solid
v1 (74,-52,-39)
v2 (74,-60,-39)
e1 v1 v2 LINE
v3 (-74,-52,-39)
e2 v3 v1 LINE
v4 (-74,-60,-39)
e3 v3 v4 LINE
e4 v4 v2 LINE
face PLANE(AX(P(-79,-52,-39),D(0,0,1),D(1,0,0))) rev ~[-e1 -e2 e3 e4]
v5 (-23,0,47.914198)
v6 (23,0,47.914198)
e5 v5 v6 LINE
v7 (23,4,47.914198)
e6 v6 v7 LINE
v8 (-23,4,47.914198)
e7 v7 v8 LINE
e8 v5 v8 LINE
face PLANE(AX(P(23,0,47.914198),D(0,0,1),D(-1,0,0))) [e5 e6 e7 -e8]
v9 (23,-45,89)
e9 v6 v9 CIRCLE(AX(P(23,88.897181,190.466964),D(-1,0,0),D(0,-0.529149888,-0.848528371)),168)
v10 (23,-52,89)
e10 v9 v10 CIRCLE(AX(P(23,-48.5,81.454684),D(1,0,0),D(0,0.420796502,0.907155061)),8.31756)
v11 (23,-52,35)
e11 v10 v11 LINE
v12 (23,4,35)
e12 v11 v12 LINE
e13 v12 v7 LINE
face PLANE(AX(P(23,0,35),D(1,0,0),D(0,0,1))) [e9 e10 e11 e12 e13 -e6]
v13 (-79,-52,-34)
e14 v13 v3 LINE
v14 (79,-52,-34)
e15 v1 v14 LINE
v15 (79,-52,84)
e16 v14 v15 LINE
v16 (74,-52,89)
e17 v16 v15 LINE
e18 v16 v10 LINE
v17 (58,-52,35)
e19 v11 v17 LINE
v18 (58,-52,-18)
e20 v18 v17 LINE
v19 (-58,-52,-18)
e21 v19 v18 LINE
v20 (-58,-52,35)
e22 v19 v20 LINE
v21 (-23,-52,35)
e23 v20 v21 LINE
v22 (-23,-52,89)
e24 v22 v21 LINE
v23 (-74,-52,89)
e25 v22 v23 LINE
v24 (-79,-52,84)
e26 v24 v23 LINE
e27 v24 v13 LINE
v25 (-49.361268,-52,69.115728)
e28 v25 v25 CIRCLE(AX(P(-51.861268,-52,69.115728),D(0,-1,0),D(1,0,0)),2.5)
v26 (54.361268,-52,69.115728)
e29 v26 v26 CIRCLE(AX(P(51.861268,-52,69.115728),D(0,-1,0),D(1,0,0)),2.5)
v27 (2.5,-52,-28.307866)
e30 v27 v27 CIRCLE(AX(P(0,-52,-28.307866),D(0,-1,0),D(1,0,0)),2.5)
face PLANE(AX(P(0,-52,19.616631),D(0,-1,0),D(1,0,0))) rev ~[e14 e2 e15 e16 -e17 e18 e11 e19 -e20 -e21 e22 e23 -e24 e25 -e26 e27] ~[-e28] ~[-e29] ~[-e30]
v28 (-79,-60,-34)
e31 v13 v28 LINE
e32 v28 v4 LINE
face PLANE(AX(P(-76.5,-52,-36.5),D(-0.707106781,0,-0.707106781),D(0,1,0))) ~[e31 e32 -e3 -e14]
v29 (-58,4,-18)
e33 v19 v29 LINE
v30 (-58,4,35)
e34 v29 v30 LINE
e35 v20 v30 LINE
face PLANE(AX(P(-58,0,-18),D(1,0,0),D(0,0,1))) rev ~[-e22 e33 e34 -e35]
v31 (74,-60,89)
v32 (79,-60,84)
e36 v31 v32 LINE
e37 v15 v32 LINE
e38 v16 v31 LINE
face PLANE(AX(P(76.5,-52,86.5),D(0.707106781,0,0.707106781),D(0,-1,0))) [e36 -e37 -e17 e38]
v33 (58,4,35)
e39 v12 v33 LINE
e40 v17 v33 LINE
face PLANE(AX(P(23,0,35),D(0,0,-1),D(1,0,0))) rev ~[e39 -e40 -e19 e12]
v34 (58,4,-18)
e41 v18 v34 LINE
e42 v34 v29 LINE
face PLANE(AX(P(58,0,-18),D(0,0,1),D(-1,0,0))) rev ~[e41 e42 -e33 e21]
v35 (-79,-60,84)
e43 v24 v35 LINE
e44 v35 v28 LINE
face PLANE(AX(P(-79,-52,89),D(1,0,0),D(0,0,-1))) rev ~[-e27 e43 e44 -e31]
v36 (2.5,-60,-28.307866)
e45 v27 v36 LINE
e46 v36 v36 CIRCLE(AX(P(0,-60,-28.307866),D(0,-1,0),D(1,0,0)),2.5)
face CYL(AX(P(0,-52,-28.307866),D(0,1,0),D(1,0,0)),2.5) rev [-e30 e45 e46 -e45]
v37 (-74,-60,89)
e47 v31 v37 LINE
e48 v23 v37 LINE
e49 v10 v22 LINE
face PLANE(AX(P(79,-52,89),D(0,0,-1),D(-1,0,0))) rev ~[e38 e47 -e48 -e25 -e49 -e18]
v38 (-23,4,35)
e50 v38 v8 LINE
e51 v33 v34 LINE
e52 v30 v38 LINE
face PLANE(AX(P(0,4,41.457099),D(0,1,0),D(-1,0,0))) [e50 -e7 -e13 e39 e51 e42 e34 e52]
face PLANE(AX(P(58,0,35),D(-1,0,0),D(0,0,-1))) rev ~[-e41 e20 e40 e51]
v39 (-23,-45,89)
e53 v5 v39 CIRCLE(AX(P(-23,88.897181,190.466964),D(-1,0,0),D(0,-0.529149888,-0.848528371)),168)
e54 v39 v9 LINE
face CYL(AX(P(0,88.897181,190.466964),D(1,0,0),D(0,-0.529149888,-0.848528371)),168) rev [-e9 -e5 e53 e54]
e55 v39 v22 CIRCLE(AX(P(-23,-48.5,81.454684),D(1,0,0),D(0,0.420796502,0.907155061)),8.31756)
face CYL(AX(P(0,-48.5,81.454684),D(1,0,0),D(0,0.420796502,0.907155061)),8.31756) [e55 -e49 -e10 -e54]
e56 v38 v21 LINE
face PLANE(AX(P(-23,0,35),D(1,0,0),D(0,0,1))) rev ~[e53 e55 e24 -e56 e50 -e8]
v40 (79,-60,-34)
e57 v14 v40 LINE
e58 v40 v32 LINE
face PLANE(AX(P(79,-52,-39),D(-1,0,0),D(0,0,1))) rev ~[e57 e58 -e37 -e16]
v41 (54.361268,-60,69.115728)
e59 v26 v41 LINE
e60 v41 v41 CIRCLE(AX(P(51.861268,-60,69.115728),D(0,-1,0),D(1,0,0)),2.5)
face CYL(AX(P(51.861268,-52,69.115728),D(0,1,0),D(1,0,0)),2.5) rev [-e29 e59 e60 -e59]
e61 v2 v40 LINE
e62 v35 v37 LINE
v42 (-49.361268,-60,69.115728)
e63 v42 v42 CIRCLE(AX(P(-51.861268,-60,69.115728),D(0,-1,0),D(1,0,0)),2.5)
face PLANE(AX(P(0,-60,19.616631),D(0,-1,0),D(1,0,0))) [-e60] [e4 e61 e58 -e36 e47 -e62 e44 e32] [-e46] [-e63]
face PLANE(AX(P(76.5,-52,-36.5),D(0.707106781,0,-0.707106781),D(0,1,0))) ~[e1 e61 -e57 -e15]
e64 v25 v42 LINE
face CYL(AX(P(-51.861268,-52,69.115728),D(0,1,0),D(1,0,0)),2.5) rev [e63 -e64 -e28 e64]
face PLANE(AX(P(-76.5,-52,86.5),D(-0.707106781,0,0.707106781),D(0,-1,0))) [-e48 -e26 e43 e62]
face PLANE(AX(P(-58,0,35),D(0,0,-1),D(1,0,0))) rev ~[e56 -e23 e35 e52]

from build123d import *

# Parameters (mm, degrees)
F0_W     = 116
F0_H     = 53
F1_DEPTH = 52
F3_DEPTH = 23
F4_R     = 2.5
F5_DEPTH = 8
F6_SIZE  = 5
F7_W     = 46
F7_H     = 12.914198093
F8_DEPTH = 4


# Not quite as in the source:
# - a feature names something its author has since deleted; it is built from what else it names


with BuildPart() as f1:
    # F0 (on Front) → F1 (new body)
    with BuildSketch(Plane.XZ):
        with Locations((0, 8.5)):
            Rectangle(F0_W, F0_H)
    extrude(amount=F1_DEPTH)

    # F2 (on Right) → F3 (join, symmetric)
    with BuildSketch(Plane.YZ):
        with BuildLine():
            Line((-45, 35), (0, 35))
            Line((0, 35), (0, 47.914198093))
            ThreePointArc((0, 47.914198093), (-24.3783358313, 66.3998162753), (-45, 89))
            Line((-45, 89), (-45, 35))
        make_face()
        with BuildLine():
            Line((-52, 35), (-45, 35))
            Line((-45, 35), (-45, 89))
            ThreePointArc((-45, 89), (-48.5, 89.7722433198), (-52, 89))
            Line((-52, 89), (-52, 35))
        make_face()
    extrude(amount=F3_DEPTH, both=True)

    # F4 (on face) → F5 (join)
    with BuildSketch(Plane.XZ.offset(52)):
        Polygon((-23, 89), (-79, 89), (-79, -39), (79, -39), (79, 89), (23, 89), (23, 35), (58, 35), (58, -18), (-58, -18), (-58, 35), (-23, 35), align=None)
        with Locations((0, -28.3078663051)):
            Circle(F4_R, mode=Mode.SUBTRACT)
        with Locations((-51.8612675369, 69.1157281399)):
            Circle(F4_R, mode=Mode.SUBTRACT)
        with Locations((51.8612675369, 69.1157281399)):
            Circle(F4_R, mode=Mode.SUBTRACT)
        Polygon((23, 89), (-23, 89), (-23, 35), (-58, 35), (-58, -18), (58, -18), (58, 35), (23, 35), align=None)
    extrude(amount=F5_DEPTH)

    # F6
    f6_edges = [f1.edges().sort_by_distance(p)[0] for p in [
        (-79, -56, 89),
        (79, -56, 89),
        (79, -56, -39),
        (-79, -56, -39),
    ]]
    chamfer(f6_edges, length=F6_SIZE)

    # F7 (on face) → F8 (join)
    with BuildSketch(Plane(origin=(0, 0, 0), x_dir=(-1, 0, 0), z_dir=(0, 1, 0))):
        with Locations((0, 41.4570990465)):
            Rectangle(F7_W, F7_H)
        Polygon((-23, 35), (-58, 35), (-58, -18), (58, -18), (58, 35), (23, 35), align=None)
    extrude(amount=F8_DEPTH)


solid = f1.part
